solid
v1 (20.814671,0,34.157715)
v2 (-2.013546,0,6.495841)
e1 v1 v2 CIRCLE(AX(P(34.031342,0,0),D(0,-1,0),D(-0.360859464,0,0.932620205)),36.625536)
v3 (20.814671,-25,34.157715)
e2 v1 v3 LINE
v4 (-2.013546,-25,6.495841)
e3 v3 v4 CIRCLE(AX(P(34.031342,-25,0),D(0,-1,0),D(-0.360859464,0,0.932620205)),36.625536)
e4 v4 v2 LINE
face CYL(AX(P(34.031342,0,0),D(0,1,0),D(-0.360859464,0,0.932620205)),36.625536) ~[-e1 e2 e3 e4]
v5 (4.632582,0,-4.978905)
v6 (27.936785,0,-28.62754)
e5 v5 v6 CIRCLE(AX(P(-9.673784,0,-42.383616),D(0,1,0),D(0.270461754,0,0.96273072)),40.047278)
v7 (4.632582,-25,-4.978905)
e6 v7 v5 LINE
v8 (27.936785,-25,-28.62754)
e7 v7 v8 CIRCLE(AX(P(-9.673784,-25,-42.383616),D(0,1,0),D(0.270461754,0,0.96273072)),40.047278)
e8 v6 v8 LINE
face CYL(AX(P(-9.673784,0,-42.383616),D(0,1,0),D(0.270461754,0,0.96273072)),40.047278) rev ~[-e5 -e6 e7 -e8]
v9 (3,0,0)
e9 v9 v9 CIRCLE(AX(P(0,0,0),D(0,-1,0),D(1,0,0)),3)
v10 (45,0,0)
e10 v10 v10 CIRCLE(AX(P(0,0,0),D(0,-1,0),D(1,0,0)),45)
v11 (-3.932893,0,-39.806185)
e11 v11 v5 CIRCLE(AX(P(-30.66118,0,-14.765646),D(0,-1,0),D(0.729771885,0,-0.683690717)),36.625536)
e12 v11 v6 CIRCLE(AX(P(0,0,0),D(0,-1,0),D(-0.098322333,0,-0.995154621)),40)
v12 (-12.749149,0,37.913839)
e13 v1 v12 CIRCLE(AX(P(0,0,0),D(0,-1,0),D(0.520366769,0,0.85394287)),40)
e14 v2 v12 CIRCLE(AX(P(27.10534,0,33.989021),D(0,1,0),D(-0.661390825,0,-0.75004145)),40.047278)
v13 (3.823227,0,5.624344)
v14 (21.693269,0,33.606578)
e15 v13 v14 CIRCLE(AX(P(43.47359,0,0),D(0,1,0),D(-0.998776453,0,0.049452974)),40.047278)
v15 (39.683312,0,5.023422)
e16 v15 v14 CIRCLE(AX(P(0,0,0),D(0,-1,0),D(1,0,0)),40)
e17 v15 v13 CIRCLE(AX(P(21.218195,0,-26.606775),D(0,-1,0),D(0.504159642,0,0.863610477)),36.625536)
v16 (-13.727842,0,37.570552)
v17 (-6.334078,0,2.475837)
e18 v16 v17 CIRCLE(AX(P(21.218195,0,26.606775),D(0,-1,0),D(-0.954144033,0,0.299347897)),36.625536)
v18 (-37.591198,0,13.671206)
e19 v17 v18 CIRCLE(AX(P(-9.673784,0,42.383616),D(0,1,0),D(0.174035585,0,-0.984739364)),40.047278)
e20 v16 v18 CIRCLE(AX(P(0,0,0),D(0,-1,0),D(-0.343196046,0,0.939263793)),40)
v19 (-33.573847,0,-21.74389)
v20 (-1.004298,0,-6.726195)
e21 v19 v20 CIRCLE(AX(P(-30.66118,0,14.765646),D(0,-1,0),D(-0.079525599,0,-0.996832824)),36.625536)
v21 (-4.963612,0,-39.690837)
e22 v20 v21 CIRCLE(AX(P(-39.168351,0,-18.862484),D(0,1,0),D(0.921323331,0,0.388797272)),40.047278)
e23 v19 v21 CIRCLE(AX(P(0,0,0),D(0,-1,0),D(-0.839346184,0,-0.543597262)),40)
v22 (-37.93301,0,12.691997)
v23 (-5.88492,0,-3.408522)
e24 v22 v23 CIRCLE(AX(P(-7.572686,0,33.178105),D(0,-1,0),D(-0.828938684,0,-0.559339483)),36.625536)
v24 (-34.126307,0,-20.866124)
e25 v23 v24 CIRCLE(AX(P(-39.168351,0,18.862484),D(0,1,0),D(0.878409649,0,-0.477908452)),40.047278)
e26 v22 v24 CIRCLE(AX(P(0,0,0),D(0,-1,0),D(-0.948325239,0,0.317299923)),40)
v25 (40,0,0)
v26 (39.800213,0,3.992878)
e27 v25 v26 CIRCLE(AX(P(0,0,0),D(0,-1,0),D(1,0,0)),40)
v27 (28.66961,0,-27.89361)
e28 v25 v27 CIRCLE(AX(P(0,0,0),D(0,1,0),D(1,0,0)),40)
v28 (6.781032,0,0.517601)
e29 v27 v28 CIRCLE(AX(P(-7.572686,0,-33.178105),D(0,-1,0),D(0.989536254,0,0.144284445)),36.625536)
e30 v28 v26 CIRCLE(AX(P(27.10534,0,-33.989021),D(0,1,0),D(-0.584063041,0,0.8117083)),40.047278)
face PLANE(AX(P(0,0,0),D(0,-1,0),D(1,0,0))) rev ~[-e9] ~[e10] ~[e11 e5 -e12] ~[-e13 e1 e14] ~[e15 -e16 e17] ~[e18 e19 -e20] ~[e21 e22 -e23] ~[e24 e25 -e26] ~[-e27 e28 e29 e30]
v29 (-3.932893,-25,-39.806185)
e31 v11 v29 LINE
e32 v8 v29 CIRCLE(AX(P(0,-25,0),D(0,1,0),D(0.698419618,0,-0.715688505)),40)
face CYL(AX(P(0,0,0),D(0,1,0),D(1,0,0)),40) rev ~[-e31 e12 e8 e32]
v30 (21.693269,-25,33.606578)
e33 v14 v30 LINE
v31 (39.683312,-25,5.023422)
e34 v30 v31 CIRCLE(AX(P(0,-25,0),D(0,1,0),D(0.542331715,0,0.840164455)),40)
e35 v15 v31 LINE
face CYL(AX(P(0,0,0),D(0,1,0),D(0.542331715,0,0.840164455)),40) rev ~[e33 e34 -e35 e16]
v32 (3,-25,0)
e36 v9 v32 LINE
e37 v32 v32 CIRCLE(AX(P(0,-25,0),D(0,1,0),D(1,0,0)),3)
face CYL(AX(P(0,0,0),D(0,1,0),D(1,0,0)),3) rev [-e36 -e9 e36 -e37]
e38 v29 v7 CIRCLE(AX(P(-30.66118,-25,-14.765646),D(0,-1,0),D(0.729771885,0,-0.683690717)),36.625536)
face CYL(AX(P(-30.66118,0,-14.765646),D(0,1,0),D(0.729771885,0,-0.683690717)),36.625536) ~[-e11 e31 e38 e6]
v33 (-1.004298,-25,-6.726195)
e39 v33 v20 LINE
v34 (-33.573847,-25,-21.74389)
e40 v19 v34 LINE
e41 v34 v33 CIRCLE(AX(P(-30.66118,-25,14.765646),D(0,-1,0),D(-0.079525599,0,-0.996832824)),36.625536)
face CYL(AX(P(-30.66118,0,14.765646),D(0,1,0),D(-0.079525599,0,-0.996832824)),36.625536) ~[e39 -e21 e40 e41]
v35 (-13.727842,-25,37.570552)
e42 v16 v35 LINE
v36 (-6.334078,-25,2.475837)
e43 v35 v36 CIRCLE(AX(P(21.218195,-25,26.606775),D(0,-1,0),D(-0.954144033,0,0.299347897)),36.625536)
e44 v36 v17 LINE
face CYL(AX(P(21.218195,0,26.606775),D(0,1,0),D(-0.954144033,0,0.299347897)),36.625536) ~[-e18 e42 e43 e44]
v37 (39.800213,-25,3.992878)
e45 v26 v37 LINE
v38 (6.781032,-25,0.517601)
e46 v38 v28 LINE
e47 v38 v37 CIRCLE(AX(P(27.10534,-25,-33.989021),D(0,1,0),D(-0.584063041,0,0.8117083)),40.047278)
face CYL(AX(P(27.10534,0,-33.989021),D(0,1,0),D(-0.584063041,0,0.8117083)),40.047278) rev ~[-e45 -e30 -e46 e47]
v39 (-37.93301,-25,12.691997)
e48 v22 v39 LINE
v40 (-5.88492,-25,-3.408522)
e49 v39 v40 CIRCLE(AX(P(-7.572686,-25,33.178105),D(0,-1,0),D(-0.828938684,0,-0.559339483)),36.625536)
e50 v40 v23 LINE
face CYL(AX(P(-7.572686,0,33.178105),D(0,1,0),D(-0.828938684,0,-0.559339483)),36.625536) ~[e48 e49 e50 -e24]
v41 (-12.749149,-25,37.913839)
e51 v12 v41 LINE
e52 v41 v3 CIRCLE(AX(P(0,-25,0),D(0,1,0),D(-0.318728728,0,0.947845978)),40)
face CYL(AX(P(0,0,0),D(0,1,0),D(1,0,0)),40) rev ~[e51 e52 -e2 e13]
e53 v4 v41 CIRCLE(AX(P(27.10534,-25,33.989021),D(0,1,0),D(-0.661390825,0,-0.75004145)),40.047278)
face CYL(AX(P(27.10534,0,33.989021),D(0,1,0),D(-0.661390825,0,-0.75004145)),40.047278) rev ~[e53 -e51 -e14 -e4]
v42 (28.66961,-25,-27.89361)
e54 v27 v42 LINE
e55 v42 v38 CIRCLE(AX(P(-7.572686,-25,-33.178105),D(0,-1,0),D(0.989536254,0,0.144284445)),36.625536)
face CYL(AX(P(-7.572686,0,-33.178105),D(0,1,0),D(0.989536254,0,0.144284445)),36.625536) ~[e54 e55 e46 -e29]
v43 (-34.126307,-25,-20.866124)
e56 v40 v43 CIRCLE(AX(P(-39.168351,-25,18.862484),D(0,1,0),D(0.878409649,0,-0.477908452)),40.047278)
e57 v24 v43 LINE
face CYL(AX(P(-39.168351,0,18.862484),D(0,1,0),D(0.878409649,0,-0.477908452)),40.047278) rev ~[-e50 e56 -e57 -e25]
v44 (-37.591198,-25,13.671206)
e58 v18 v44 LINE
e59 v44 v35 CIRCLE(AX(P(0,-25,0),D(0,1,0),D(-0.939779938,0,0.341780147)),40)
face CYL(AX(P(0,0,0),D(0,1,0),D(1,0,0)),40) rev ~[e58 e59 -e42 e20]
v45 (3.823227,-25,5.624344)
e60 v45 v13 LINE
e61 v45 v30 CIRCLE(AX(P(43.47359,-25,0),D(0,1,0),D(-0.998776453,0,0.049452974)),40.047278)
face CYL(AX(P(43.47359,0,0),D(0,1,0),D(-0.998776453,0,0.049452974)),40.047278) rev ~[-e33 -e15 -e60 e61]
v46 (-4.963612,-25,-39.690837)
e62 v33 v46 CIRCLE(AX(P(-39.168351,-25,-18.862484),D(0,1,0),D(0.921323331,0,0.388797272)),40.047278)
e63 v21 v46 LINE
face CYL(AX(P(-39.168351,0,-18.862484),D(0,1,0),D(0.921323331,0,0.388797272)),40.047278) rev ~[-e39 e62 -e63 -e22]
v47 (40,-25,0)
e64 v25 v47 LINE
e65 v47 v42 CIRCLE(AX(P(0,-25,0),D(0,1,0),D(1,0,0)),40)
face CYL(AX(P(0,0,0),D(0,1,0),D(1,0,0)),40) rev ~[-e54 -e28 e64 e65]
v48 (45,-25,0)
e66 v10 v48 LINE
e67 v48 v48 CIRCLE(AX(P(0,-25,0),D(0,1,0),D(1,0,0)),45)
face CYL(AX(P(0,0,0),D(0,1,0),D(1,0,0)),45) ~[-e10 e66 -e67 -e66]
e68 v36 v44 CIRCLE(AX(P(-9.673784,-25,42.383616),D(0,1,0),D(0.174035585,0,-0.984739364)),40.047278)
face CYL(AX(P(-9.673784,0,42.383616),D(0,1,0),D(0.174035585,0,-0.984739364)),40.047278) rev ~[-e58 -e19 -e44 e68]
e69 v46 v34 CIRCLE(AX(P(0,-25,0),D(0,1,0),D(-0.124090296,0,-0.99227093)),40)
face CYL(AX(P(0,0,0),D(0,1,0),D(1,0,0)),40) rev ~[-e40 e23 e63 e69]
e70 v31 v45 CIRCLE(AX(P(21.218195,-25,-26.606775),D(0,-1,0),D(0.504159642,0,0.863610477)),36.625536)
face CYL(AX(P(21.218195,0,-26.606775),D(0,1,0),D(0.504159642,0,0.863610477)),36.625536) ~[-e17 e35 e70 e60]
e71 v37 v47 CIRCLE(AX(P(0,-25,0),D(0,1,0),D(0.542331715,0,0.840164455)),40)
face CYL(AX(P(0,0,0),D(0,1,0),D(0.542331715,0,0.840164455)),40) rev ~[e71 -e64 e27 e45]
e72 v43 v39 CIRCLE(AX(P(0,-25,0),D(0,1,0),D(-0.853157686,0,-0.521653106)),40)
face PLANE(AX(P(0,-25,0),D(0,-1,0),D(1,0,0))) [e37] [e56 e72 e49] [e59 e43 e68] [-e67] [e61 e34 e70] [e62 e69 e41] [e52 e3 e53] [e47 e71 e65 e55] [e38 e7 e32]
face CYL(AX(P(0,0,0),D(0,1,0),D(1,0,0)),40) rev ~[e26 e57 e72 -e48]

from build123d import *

# Parameters (mm, degrees)
F0_R     = 45
F0_R_2   = 3
F1_DEPTH = 25
F2_COUNT = 7


# Not quite as in the source:
# - a feature names something its author has since deleted; it is built from what else it names


with BuildPart() as f1:
    # F0 (on Front) → F1 (new body)
    with BuildSketch(Plane.XZ):
        Circle(F0_R)
        with BuildLine():
            ThreePointArc((40, 0), (-34.8753984239, -19.58842987), (20.8146707615, 34.1577148107))
            ThreePointArc((20.8146707615, 34.1577148107), (21.2557560399, 33.8849942478), (21.693268588, 33.6065781949))
            ThreePointArc((21.693268588, 33.6065781949), (35.126419854, 19.1346447116), (40, 0))
        make_face(mode=Mode.SUBTRACT)
        with BuildLine():
            ThreePointArc((20.8146707615, 34.1577148107), (4.7404997755, 21.9880977011), (-2.457993575, 3.1556722874))
            ThreePointArc((-2.457993575, 3.1556722874), (-0.7771850997, -3.9237715684), (3.4753115022, 1.9804570085))
            ThreePointArc((3.4753115022, 1.9804570085), (8.7719800119, 19.9895662469), (21.693268588, 33.6065781949))
            ThreePointArc((21.693268588, 33.6065781949), (21.2557560399, 33.8849942478), (20.8146707615, 34.1577148107))
        make_face()
        Circle(F0_R_2, mode=Mode.SUBTRACT)
    extrude(amount=F1_DEPTH)

    # F2: F1 ×7 about axis
    f2_axis = Axis((0, -25, 0), (0, -1, 0))


with BuildPart() as f1_1:
    add(f1.part)
    for i in range(1, F2_COUNT):
        add(f1.part.rotate(f2_axis, i * 360 / F2_COUNT))


solid = f1_1.part
